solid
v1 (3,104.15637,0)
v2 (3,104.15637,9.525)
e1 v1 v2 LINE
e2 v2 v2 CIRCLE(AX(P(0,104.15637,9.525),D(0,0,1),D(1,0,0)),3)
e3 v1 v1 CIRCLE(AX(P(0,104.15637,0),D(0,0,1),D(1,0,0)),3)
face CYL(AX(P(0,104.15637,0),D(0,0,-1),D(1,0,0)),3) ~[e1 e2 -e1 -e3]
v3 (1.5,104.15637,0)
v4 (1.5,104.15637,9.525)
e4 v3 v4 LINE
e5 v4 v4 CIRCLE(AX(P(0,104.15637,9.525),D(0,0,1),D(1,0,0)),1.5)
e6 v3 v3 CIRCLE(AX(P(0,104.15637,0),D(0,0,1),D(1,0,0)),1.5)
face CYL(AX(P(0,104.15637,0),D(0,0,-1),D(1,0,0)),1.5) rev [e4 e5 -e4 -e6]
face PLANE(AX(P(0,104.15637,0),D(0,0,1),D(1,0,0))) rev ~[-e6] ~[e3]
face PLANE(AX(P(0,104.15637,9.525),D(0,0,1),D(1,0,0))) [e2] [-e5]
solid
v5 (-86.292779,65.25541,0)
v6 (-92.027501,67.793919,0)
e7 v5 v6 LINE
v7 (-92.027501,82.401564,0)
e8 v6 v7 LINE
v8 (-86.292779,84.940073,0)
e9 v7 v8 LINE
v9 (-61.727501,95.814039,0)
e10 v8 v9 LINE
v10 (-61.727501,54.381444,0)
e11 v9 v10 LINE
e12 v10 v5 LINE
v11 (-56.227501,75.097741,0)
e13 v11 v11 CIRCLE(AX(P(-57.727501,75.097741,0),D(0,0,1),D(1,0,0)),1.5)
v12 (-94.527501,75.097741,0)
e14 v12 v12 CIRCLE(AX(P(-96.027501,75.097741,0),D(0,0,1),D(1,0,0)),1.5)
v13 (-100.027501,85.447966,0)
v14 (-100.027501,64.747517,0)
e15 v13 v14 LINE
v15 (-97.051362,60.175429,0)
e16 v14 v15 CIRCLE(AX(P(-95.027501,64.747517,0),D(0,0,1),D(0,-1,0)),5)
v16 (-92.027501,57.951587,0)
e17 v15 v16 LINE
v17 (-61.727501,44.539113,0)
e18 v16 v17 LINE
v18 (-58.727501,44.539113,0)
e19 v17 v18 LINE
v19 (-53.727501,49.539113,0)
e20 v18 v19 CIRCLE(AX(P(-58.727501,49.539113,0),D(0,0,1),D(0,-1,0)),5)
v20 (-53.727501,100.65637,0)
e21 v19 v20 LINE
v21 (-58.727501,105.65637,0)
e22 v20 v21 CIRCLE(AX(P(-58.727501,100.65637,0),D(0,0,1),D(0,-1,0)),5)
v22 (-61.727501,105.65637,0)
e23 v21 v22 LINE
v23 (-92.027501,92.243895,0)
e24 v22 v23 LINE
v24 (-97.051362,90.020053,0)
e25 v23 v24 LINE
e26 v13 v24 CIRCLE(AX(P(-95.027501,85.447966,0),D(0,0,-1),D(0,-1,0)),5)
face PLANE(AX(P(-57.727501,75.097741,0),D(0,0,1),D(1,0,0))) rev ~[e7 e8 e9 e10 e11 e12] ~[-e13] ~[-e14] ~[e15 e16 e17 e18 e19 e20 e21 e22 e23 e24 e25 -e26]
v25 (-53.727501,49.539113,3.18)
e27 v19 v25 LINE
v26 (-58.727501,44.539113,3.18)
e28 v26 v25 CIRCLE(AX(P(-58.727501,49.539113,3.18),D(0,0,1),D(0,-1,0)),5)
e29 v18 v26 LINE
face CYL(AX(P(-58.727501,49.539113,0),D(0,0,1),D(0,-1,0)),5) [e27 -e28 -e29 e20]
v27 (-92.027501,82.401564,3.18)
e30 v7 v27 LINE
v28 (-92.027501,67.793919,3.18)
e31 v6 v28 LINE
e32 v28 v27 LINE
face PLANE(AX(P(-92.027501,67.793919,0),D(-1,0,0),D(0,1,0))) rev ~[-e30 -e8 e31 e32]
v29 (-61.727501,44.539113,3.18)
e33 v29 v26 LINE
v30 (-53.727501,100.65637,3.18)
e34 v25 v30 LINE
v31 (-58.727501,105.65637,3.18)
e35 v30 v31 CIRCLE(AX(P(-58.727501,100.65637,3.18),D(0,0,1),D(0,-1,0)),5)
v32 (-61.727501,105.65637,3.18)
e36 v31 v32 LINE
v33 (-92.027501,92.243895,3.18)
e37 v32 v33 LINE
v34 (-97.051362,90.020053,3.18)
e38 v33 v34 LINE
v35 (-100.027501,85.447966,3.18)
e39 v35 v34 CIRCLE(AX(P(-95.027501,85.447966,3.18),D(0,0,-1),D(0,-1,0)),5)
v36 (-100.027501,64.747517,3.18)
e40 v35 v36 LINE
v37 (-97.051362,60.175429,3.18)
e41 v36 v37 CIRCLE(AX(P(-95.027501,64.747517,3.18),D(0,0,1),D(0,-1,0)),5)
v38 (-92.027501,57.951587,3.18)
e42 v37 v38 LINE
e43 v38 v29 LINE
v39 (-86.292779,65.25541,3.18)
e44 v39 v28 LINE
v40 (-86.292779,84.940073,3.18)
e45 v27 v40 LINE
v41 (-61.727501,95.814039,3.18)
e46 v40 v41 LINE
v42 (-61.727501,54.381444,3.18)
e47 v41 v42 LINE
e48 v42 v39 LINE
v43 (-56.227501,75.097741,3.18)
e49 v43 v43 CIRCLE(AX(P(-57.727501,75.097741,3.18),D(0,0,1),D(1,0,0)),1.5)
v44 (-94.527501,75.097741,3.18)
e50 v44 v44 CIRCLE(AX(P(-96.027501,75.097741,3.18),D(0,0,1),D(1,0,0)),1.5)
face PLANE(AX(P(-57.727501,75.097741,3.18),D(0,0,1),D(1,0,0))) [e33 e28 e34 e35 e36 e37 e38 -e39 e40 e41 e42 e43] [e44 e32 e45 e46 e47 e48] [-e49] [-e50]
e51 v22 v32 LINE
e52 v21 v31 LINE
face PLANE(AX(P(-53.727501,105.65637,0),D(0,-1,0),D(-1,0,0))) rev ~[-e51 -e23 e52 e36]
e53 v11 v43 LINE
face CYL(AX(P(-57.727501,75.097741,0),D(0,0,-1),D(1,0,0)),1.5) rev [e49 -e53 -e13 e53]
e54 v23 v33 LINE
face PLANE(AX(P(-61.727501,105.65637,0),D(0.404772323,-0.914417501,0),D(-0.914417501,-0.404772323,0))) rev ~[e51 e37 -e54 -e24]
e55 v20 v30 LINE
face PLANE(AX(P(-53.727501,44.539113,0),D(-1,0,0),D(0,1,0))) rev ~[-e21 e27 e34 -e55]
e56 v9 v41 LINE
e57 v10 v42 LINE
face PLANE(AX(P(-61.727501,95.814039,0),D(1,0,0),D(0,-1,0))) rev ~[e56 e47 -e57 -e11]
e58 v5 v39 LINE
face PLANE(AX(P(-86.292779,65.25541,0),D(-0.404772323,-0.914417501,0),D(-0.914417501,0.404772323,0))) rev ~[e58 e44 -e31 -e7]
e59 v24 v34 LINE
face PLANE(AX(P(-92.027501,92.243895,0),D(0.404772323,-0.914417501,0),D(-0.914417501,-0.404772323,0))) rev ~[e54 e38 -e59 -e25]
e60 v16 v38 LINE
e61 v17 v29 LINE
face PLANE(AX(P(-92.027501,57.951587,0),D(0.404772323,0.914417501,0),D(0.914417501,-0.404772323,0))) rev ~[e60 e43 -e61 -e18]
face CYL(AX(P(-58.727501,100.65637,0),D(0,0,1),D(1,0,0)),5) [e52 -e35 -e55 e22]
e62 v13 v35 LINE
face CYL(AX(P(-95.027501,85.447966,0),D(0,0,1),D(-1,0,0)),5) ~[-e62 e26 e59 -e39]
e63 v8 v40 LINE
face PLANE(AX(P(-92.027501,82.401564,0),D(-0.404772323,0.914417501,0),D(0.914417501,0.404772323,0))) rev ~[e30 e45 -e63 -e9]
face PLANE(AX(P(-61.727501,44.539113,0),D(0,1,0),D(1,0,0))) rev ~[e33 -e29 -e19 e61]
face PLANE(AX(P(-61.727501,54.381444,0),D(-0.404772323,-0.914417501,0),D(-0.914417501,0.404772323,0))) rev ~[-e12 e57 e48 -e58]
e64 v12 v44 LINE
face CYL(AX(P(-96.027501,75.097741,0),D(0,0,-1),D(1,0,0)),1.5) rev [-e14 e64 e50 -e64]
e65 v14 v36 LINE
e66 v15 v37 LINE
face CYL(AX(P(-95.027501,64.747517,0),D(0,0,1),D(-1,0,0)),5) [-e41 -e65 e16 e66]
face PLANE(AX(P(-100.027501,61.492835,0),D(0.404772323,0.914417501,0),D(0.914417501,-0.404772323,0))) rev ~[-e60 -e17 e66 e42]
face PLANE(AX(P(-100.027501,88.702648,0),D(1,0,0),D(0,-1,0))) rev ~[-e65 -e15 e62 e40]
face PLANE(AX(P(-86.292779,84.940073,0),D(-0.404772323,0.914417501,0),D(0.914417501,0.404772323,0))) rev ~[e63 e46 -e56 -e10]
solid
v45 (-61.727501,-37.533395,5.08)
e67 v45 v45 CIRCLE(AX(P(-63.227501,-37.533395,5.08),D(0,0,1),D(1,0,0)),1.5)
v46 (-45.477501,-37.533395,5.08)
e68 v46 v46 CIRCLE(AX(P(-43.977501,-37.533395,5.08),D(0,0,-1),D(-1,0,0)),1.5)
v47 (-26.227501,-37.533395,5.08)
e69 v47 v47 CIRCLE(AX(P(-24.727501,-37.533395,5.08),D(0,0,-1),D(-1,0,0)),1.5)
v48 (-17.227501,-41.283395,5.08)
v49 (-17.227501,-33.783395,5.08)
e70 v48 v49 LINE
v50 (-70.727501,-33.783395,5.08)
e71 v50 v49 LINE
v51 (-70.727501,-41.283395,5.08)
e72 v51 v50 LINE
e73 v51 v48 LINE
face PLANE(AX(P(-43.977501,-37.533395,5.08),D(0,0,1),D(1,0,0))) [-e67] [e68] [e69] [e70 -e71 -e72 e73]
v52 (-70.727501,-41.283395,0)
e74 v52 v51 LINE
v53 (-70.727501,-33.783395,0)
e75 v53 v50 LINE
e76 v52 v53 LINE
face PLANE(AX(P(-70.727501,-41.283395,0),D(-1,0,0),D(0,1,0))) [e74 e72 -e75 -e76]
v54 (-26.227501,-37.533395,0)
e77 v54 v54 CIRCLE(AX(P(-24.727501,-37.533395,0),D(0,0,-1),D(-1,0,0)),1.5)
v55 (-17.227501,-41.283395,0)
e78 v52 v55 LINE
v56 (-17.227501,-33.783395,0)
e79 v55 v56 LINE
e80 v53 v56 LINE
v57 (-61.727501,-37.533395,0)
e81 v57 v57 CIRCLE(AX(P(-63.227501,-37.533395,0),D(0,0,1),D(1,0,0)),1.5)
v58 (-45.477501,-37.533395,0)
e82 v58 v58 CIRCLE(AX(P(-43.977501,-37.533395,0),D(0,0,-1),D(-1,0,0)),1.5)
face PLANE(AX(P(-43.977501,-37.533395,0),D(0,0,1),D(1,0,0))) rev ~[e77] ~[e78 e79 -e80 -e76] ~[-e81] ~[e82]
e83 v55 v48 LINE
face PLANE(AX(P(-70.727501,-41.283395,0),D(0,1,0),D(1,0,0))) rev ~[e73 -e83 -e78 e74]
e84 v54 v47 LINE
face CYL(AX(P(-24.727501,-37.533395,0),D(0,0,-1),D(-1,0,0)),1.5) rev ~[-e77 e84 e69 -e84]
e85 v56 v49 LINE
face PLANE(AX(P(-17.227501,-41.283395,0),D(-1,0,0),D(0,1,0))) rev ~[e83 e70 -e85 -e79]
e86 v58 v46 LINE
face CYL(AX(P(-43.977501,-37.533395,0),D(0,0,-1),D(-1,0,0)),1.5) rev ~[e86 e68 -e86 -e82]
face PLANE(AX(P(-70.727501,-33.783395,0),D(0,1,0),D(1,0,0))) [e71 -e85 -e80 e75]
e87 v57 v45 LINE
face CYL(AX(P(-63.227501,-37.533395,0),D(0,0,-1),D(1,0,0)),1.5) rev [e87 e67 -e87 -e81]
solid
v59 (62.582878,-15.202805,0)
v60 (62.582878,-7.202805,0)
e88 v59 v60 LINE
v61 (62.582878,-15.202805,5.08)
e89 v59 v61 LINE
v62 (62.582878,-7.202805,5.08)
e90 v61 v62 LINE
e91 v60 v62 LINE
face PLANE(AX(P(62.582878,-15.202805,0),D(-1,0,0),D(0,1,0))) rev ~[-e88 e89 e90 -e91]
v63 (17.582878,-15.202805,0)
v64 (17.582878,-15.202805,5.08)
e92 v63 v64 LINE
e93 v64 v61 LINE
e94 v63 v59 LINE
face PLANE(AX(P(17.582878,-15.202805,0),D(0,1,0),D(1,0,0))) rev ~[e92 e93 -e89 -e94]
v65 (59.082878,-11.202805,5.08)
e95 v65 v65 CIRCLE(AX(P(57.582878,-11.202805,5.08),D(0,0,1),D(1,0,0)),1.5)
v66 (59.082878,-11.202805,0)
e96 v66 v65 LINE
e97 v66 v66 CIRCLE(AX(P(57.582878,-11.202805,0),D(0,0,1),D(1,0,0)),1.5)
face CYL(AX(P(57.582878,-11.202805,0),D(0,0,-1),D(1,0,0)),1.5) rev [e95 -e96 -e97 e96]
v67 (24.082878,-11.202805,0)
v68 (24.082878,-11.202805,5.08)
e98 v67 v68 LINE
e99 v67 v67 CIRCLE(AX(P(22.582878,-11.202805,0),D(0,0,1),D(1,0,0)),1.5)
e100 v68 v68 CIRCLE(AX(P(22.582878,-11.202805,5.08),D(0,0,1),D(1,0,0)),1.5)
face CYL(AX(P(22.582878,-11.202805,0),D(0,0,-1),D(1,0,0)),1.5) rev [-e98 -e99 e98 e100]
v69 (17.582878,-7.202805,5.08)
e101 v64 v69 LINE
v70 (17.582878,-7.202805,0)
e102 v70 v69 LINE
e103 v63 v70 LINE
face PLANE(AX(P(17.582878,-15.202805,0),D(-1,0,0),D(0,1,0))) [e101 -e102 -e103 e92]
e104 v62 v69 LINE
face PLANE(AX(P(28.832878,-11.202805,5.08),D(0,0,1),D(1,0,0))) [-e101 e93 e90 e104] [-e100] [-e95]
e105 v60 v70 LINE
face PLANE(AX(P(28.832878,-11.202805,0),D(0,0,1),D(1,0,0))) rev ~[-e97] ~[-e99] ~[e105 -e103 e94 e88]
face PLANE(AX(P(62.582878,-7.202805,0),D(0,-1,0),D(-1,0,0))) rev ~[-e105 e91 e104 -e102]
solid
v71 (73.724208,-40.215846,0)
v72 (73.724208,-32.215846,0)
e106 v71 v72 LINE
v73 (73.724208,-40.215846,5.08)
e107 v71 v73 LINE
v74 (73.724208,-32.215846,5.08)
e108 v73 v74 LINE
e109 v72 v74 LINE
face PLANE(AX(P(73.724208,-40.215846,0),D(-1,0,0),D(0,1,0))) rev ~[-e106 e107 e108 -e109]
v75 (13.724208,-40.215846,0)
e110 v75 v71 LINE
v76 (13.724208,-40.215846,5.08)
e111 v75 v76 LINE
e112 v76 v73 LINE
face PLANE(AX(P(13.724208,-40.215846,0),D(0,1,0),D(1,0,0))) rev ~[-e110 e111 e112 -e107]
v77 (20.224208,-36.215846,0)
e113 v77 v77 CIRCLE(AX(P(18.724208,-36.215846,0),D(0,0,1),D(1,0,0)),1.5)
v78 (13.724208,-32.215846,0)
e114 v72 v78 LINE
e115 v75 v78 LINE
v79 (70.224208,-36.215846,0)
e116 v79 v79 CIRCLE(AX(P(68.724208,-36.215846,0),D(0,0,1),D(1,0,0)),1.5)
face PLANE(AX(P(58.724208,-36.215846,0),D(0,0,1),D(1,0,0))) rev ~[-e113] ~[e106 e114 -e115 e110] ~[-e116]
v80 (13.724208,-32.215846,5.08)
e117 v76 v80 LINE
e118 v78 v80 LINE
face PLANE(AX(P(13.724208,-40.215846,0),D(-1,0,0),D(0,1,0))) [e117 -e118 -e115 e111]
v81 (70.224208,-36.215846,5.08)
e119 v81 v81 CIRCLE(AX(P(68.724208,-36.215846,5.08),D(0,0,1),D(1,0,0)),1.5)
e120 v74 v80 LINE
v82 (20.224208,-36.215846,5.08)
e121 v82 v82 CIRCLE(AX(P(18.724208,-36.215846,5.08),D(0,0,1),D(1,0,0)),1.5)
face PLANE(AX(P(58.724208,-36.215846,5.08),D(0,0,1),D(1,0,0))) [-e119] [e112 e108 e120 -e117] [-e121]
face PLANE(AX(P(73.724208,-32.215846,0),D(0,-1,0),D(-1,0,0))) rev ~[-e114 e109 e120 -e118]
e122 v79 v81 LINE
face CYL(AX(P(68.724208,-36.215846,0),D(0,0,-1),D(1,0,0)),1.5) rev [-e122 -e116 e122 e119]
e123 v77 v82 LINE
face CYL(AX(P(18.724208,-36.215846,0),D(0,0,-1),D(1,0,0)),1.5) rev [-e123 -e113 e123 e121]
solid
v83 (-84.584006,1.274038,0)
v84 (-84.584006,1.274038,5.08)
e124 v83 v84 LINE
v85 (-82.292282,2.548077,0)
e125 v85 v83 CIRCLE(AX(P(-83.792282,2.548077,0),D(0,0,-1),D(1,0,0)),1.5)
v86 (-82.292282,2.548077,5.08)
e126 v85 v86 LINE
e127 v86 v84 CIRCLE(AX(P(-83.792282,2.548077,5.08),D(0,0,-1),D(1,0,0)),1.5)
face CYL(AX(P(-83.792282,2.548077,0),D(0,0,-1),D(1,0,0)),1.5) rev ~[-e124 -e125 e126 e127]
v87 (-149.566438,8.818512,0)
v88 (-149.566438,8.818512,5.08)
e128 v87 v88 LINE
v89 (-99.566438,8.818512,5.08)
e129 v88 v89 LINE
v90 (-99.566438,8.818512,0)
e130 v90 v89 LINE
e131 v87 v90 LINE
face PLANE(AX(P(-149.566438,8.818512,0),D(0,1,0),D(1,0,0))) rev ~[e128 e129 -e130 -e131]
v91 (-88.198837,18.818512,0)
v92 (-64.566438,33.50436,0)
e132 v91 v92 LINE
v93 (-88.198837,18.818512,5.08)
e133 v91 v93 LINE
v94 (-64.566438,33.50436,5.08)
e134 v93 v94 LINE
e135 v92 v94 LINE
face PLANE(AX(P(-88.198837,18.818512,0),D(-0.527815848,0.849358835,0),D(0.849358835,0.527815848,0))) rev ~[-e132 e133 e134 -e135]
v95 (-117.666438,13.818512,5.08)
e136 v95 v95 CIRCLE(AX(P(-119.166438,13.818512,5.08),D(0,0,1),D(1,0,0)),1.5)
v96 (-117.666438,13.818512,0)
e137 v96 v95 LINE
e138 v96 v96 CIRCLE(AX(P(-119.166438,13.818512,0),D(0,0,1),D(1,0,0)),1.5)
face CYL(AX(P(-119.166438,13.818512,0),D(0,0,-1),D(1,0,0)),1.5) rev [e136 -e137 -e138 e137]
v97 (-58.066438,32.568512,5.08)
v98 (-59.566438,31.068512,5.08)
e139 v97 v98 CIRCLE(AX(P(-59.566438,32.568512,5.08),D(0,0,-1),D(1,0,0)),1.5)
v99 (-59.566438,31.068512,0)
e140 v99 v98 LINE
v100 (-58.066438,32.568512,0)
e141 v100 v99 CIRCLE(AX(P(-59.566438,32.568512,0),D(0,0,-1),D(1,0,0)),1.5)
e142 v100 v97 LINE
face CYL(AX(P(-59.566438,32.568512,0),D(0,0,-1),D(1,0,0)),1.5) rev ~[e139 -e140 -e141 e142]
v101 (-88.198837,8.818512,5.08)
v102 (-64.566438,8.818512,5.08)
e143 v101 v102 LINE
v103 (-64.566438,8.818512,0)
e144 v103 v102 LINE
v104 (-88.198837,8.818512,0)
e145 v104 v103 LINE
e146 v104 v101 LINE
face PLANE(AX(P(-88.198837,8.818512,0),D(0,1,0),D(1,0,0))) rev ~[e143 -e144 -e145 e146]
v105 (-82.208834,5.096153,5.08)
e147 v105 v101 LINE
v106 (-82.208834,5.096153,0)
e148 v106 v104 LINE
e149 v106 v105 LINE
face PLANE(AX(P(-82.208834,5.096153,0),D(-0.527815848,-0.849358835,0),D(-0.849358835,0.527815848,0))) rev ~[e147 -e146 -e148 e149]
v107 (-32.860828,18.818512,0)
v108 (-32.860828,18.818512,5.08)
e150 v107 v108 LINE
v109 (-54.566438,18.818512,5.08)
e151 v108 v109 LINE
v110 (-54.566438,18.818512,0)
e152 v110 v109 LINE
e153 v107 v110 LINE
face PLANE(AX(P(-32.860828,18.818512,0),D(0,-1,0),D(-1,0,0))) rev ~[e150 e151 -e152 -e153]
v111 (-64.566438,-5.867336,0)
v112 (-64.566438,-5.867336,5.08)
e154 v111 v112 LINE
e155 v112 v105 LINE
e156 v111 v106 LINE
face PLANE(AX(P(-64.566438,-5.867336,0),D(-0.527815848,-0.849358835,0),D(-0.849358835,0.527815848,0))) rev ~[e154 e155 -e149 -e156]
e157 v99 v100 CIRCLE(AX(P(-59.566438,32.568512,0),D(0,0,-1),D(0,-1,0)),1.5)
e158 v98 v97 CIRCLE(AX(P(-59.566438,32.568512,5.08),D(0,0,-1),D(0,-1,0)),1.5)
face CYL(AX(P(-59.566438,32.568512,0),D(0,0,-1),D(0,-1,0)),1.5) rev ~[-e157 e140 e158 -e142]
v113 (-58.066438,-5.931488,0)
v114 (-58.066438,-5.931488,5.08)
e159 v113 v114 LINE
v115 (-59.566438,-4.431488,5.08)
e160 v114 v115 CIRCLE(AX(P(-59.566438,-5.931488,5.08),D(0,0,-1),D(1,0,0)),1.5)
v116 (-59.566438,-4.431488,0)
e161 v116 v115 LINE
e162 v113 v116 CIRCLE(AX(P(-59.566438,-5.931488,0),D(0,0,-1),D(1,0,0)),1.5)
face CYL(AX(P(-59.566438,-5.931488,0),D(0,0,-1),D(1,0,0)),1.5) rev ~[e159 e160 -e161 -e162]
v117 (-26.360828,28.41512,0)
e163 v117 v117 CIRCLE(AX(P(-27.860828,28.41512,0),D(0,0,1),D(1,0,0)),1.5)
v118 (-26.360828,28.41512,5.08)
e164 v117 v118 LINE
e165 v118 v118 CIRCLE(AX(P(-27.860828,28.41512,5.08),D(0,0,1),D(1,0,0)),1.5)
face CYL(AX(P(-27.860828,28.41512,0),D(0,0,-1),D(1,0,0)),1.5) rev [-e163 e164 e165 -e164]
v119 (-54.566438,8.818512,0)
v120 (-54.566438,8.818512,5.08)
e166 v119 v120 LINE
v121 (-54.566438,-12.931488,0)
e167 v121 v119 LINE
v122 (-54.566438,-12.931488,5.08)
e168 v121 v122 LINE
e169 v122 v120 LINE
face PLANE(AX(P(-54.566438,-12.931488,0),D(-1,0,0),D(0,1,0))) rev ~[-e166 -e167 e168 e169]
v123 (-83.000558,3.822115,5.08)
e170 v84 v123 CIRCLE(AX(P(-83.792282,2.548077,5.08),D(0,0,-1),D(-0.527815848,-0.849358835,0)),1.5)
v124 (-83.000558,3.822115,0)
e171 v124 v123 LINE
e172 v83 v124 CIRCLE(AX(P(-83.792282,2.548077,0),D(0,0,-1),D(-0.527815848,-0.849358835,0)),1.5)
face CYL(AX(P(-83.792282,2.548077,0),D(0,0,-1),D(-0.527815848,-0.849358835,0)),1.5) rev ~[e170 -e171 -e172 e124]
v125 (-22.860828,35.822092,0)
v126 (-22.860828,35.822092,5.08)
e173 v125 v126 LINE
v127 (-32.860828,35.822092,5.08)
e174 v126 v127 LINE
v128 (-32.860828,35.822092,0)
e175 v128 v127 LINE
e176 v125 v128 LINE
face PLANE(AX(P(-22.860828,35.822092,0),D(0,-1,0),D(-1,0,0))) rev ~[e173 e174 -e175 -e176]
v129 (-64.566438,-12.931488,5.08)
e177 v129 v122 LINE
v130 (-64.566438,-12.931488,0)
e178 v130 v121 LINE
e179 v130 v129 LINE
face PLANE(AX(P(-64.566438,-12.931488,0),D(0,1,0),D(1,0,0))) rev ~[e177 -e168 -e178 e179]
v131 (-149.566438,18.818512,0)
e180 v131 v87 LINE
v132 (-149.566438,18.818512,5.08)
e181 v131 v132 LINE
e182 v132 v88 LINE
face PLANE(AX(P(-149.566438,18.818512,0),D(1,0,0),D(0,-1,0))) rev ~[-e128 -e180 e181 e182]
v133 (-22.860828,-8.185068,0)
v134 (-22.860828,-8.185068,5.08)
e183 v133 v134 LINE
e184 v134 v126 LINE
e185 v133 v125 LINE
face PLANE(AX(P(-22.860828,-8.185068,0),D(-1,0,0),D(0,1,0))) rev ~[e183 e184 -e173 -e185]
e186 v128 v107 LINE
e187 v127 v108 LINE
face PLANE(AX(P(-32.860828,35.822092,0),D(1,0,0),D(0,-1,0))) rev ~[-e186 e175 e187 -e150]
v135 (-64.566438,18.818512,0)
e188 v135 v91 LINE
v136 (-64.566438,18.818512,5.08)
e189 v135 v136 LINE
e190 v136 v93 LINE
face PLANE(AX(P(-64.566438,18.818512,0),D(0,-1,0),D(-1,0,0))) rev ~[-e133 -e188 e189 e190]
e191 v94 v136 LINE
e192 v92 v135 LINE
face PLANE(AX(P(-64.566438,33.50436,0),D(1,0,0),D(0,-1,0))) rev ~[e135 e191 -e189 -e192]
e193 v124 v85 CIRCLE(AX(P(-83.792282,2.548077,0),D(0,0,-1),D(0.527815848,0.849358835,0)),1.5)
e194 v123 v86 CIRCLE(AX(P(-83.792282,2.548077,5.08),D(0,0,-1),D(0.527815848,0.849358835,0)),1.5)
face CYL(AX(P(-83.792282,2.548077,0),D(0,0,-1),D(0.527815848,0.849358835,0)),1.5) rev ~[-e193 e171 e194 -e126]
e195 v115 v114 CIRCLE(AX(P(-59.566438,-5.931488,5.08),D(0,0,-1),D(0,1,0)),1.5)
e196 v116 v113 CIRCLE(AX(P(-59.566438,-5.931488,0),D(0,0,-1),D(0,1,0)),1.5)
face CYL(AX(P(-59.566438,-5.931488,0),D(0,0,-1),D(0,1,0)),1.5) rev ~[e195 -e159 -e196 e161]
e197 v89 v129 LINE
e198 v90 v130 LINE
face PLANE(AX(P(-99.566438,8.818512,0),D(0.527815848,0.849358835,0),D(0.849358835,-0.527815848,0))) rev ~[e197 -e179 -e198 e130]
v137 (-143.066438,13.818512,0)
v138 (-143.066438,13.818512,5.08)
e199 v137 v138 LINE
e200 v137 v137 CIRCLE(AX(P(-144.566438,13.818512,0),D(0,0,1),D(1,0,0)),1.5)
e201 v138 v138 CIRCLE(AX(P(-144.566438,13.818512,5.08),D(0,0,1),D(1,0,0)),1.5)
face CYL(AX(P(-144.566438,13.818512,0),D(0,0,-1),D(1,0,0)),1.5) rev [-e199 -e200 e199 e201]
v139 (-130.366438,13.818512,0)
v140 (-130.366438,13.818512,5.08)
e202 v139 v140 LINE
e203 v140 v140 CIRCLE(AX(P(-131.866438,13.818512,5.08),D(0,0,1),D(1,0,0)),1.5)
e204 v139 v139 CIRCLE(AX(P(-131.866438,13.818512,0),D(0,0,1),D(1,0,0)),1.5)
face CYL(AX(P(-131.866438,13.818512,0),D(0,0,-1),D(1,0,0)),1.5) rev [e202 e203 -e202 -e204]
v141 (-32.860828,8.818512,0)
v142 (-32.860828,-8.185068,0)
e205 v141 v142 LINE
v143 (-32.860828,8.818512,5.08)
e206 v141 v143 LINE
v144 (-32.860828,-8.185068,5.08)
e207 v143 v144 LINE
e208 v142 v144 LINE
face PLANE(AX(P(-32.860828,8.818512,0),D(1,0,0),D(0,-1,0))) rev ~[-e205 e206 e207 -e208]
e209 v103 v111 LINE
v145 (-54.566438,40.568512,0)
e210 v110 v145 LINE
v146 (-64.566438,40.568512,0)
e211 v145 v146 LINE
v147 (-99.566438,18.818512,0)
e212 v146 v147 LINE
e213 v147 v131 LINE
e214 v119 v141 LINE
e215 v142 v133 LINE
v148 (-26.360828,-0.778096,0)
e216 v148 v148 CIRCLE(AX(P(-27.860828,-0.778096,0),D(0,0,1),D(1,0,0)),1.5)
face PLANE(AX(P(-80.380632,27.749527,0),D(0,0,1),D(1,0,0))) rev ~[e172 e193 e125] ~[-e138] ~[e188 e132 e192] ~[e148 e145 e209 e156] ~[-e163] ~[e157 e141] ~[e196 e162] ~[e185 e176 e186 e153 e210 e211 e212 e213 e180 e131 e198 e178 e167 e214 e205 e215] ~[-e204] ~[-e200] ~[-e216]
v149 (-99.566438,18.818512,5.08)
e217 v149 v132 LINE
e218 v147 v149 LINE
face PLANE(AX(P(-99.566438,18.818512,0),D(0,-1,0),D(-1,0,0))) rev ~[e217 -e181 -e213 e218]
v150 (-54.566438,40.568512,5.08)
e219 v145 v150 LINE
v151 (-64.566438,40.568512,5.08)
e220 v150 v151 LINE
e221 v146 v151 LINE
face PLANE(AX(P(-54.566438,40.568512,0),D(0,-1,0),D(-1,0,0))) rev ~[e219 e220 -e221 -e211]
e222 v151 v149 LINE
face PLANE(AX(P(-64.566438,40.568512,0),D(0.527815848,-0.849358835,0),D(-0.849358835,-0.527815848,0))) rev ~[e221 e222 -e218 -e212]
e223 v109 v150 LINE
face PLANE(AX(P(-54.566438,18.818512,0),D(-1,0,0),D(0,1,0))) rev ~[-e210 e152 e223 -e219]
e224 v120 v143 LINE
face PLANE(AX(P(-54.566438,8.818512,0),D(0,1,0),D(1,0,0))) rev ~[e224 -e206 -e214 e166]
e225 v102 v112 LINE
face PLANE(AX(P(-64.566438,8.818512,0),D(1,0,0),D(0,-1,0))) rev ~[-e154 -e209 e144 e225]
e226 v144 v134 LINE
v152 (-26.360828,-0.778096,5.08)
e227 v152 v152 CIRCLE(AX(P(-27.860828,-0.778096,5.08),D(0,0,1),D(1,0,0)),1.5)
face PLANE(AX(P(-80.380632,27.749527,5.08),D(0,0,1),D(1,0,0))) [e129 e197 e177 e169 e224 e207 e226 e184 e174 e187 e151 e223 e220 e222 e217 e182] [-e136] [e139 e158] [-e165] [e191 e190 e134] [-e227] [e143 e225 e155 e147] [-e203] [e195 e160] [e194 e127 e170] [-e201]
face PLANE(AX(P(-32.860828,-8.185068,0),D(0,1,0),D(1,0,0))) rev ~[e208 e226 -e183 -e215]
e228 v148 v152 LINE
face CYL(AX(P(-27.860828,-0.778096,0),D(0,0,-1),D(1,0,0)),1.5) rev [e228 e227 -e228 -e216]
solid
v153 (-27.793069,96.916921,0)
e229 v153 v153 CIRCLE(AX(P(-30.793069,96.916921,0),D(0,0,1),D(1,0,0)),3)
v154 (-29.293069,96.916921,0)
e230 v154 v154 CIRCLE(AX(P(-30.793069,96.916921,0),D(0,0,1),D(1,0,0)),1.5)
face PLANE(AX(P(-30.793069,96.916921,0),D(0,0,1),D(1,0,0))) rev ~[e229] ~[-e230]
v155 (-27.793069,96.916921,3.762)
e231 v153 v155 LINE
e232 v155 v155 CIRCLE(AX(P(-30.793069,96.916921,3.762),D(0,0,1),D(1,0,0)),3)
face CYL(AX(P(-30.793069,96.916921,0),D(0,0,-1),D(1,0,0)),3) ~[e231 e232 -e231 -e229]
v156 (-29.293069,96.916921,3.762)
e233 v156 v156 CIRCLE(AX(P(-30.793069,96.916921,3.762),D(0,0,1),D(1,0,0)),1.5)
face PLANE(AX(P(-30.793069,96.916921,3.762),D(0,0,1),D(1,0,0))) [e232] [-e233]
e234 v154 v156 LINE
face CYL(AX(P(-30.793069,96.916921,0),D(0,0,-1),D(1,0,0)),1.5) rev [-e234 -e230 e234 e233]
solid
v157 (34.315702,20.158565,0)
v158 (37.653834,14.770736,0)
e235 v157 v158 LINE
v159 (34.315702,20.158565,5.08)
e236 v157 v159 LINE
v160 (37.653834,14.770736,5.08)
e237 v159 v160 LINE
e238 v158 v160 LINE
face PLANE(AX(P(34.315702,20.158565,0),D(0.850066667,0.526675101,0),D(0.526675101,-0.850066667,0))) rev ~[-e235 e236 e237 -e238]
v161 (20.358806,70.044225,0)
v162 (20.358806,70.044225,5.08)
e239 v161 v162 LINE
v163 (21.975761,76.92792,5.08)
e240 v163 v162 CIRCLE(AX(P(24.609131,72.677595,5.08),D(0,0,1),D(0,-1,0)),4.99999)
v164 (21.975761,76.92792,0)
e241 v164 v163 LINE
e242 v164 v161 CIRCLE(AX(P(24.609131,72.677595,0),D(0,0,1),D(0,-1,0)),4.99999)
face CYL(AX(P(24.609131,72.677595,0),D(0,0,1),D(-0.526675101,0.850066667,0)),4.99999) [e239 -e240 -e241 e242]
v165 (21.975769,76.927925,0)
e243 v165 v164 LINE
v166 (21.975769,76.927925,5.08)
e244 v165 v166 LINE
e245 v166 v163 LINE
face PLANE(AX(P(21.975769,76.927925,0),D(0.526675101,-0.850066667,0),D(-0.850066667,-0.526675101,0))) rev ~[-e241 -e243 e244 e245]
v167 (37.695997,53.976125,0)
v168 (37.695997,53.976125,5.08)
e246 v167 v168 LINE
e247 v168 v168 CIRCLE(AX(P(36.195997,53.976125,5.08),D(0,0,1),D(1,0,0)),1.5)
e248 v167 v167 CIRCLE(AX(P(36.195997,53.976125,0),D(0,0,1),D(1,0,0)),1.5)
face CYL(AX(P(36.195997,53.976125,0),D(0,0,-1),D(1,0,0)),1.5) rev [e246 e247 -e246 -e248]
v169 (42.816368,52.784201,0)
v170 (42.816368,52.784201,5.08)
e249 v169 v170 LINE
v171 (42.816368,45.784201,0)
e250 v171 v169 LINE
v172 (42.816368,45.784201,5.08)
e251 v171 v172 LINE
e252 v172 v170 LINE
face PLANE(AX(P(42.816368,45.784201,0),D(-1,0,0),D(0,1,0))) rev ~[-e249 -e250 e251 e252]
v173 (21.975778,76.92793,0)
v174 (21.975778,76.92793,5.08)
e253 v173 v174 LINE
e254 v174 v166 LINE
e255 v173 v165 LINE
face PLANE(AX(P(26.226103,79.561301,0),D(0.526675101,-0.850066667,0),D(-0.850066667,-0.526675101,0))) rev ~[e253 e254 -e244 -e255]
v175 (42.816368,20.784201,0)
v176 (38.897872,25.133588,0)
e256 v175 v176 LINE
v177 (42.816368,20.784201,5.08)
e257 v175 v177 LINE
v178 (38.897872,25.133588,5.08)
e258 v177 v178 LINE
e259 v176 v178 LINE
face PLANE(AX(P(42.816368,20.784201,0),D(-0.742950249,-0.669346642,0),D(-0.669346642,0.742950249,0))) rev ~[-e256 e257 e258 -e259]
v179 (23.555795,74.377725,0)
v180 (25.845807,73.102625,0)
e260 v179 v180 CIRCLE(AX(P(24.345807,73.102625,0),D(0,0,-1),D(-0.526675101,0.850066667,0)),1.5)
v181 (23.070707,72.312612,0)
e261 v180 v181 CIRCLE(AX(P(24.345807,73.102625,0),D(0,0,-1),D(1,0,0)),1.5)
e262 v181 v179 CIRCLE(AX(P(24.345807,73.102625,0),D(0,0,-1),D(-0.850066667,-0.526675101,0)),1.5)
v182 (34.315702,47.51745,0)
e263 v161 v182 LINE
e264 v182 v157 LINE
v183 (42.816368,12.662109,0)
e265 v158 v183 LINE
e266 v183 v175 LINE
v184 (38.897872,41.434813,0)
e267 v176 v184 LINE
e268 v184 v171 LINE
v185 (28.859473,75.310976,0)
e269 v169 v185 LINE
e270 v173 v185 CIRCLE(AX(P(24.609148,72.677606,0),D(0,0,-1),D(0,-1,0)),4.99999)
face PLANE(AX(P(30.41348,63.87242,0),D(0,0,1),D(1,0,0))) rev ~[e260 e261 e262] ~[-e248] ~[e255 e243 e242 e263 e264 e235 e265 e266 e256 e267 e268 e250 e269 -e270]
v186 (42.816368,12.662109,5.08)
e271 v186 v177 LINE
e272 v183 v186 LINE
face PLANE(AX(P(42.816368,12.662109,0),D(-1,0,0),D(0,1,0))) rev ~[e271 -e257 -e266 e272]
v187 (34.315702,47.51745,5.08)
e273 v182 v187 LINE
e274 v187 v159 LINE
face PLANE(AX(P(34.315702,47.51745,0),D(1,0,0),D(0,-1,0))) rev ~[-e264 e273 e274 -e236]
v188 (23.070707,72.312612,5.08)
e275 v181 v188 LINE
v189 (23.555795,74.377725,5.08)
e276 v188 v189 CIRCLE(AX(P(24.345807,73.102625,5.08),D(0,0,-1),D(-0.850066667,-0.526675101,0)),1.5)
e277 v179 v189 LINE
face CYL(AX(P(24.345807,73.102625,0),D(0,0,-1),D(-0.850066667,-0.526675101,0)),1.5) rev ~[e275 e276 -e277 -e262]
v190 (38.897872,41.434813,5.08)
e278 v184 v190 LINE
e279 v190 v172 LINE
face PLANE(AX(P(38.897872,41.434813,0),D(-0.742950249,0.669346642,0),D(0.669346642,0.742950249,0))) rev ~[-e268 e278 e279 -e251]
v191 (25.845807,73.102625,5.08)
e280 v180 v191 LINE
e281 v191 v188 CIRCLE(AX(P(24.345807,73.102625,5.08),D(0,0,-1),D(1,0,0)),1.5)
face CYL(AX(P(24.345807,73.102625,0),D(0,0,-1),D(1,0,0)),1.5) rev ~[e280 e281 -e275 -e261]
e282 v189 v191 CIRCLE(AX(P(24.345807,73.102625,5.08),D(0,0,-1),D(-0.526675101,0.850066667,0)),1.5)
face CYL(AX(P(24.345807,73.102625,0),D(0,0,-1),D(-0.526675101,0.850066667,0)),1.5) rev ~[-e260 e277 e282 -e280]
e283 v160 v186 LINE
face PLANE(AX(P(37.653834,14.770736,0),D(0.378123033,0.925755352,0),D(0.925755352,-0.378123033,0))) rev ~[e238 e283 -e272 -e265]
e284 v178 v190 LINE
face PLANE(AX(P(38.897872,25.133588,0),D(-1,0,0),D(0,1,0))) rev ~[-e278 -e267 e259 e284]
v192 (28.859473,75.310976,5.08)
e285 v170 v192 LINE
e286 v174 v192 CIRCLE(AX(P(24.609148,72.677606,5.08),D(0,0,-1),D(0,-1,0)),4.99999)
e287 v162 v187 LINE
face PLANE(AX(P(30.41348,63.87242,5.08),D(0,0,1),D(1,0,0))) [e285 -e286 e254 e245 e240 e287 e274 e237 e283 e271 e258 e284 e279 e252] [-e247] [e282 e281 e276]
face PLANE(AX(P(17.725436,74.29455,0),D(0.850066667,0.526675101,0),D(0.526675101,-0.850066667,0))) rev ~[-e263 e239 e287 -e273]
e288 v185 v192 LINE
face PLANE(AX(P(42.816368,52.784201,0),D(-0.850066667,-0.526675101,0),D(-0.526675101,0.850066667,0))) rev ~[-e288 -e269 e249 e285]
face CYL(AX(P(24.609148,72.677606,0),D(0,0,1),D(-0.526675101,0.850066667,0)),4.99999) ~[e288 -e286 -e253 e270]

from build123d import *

# Parameters (mm, degrees)
F0_W     = 8
F0_H     = 19.684662618
F0_R     = 1.5
F0_H_2   = 10.8739659115
F1_DEPTH = 3.18
F0_R_2   = 3
F2_DEPTH = 3.762
F3_DEPTH = 5.08
F0_W_2   = 53.5
F0_H_3   = 7.5
F0_W_3   = 5
F0_H_4   = 5
F0_W_4   = 16.7056103051
F0_H_5   = 10
F0_W_5   = 22.5
F0_H_6   = 8
F0_W_6   = 30
F4_R     = 4.99999
F5_DEPTH = 9.525
F6_R     = 5


# Not quite as in the source:
# - a fillet or chamfer is up to 0.001 mm smaller than in the source, because OpenCascade refuses the exact size
# - a feature names something its author has since deleted; it is built from what else it names


with BuildPart() as f1:
    # F0 (on Top) → F1 (new body)
    with BuildSketch(Plane.XY):
        with Locations((-57.7275006586, 75.0977412903)):
            Rectangle(F0_W, F0_H)
        with Locations((-57.7275006586, 75.0977412903)):
            Circle(F0_R, mode=Mode.SUBTRACT)
        with Locations((-57.7275006586, 90.3770555551)):
            Rectangle(F0_W, F0_H_2)
        Polygon((-61.7275006586, 95.8140385108), (-53.7275006586, 95.8140385108), (-53.7275006586, 105.6563698198), (-61.7275006586, 105.6563698198), (-92.0275006586, 92.2438953373), (-92.0275006586, 84.9400725994), (-86.2927788664, 84.9400725994), align=None)
        with Locations((-57.7275006586, 59.8184270256)):
            Rectangle(F0_W, F0_H_2)
        Polygon((-92.0275006586, 82.4015640283), (-86.2927788664, 84.9400725994), (-92.0275006586, 84.9400725994), align=None)
        Polygon((-53.7275006586, 44.5391127608), (-53.7275006586, 54.3814440698), (-61.7275006586, 54.3814440698), (-86.2927788664, 65.2554099813), (-92.0275006586, 65.2554099813), (-92.0275006586, 57.9515872433), (-61.7275006586, 44.5391127608), align=None)
        Polygon((-92.0275006586, 82.4015640283), (-92.0275006586, 84.9400725994), (-100.0275006586, 84.9400725994), (-100.0275006586, 78.8603166402), align=None)
        Polygon((-100.0275006586, 84.9400725994), (-92.0275006586, 84.9400725994), (-92.0275006586, 92.2438953373), (-100.0275006586, 88.7026479492), align=None)
        Polygon((-92.0275006586, 67.7939185523), (-92.0275006586, 82.4015640283), (-100.0275006586, 78.8603166402), (-100.0275006586, 71.3351659405), align=None)
        with Locations((-96.0275006586, 75.0977412903)):
            Circle(F0_R, mode=Mode.SUBTRACT)
        Polygon((-92.0275006586, 65.2554099813), (-86.2927788664, 65.2554099813), (-92.0275006586, 67.7939185523), align=None)
        Polygon((-92.0275006586, 65.2554099813), (-92.0275006586, 67.7939185523), (-100.0275006586, 71.3351659405), (-100.0275006586, 65.2554099813), align=None)
        Polygon((-92.0275006586, 57.9515872433), (-92.0275006586, 65.2554099813), (-100.0275006586, 65.2554099813), (-100.0275006586, 61.4928346314), align=None)
    extrude(amount=F1_DEPTH)

    # F6
    f6_edges = [f1.edges().sort_by_distance(p)[0] for p in [
        (-100.027501, 61.492835, 1.59),
        (-100.027501, 88.702648, 1.59),
        (-53.727501, 105.65637, 1.59),
        (-53.727501, 44.539113, 1.59),
    ]]
    fillet(f6_edges, radius=F6_R)


with BuildPart() as f2:
    # F0 (on Top) → F2 (new body)
    with BuildSketch(Plane.XY):
        with Locations((-30.7930689305, 96.9169214368)):
            Circle(F0_R_2)
        with Locations((-30.7930689305, 96.9169214368)):
            Circle(F0_R, mode=Mode.SUBTRACT)
    extrude(amount=F2_DEPTH)


with BuildPart() as f3:
    # F0 (on Top) → F3 (new body)
    with BuildSketch(Plane.XY):
        with BuildLine():
            ThreePointArc((23.5557945233, 74.3777250811), (25.0755266494, 74.4131629436), (25.8458071751, 73.1026250811))
            ThreePointArc((25.8458071751, 73.1026250811), (24.756507796, 71.659945283), (23.0707071751, 72.3126124293))
            Line((23.0707071751, 72.3126124293), (20.0954738417, 70.4692495751))
            Line((20.0954738417, 70.4692495751), (26.0205687302, 60.9059995751))
            Line((26.0205687302, 60.9059995751), (31.9456636187, 51.3427495751))
            Line((31.9456636187, 51.3427495751), (34.3157015741, 47.5174495751))
            Line((34.3157015741, 47.5174495751), (38.5660349074, 50.1508250811))
            Line((38.5660349074, 50.1508250811), (42.8163682408, 52.7842005871))
            Line((42.8163682408, 52.7842005871), (40.4463302854, 56.6095005871))
            Line((40.4463302854, 56.6095005871), (28.5961405084, 75.7360005871))
            Line((28.5961405084, 75.7360005871), (26.226102553, 79.5613005871))
            Line((26.226102553, 79.5613005871), (21.9757692197, 76.9279250811))
            Line((21.9757692197, 76.9279250811), (23.5557945233, 74.3777250811))
        make_face()
        with Locations((36.195996952, 53.9761250811)):
            Circle(F0_R, mode=Mode.SUBTRACT)
        with BuildLine():
            ThreePointArc((23.0707071751, 72.3126124293), (22.8855520151, 73.4456336345), (23.5557945233, 74.3777250811))
            Line((23.5557945233, 74.3777250811), (21.9757692197, 76.9279250811))
            Line((21.9757692197, 76.9279250811), (17.7254358863, 74.2945495751))
            Line((17.7254358863, 74.2945495751), (20.0954738417, 70.4692495751))
            Line((20.0954738417, 70.4692495751), (23.0707071751, 72.3126124293))
        make_face()
        Polygon((38.5660349074, 50.1508250811), (34.3157015741, 47.5174495751), (34.3157015741, 33.2842005871), (38.8978719711, 33.2842005871), (38.8978719711, 41.4348132908), (38.8978719711, 45.7842005871), (42.8163682408, 45.7842005871), (42.8163682408, 52.7842005871), align=None)
        Polygon((38.8978719711, 41.4348132908), (42.8163682408, 45.7842005871), (38.8978719711, 45.7842005871), align=None)
        Polygon((38.8978719711, 33.2842005871), (34.3157015741, 33.2842005871), (34.3157015741, 20.1585646719), (37.6538338433, 14.7707364557), (42.8163682408, 12.6621089876), (42.8163682408, 20.7842005871), (38.8978719711, 20.7842005871), (38.8978719711, 25.1335878834), align=None)
        Polygon((42.8163682408, 20.7842005871), (38.8978719711, 25.1335878834), (38.8978719711, 20.7842005871), align=None)
    extrude(amount=F3_DEPTH)

    # F4 (radius 5 in the source; OpenCascade refuses exactly that, so slightly less here)
    f4_edges = [f3.edges().sort_by_distance(p)[0] for p in [
        (17.725436, 74.29455, 2.54),
        (26.226103, 79.561301, 2.54),
    ]]
    fillet(f4_edges, radius=F4_R)


with BuildPart() as f3b:
    # F0 (on Top) → F3, piece 2 (new body)
    with BuildSketch(Plane.XY):
        with Locations((-43.9775006586, -37.5333949924)):
            Rectangle(F0_W_2, F0_H_3)
        with Locations((-63.2275006586, -37.5333949924)):
            Circle(F0_R, mode=Mode.SUBTRACT)
        with BuildLine():
            ThreePointArc((-42.4775006586, -37.5333949924), (-43.9775006586, -39.0333949924), (-45.4775006586, -37.5333949924))
            ThreePointArc((-45.4775006586, -37.5333949924), (-43.9775006586, -36.0333949924), (-42.4775006586, -37.5333949924))
        make_face(mode=Mode.SUBTRACT)
        with BuildLine():
            ThreePointArc((-23.2275006586, -37.5333949924), (-24.7275006586, -39.0333949924), (-26.2275006586, -37.5333949924))
            ThreePointArc((-26.2275006586, -37.5333949924), (-24.7275006586, -36.0333949924), (-23.2275006586, -37.5333949924))
        make_face(mode=Mode.SUBTRACT)
    extrude(amount=F3_DEPTH)


with BuildPart() as f3c:
    # F0 (on Top) → F3, piece 3 (new body)
    with BuildSketch(Plane.XY):
        Polygon((-99.5664379767, 18.8185117334), (-88.1988368955, 18.8185117334), (-64.5664379767, 33.504359633), (-64.5664379767, 40.5685117334), align=None)
        Polygon((-64.5664379767, 33.504359633), (-64.5664379767, 18.8185117334), (-59.5664379767, 18.8185117334), (-54.5664379767, 18.8185117334), (-54.5664379767, 40.5685117334), (-64.5664379767, 40.5685117334), align=None)
        with BuildLine():
            ThreePointArc((-58.0664379767, 32.5685117334), (-58.5057778049, 31.5078515616), (-59.5664379767, 31.0685117334))
            ThreePointArc((-59.5664379767, 31.0685117334), (-60.6270981485, 33.6291719052), (-58.0664379767, 32.5685117334))
        make_face(mode=Mode.SUBTRACT)
        with Locations((-62.0664379767, 16.3185117334)):
            Rectangle(F0_W_3, F0_H_4)
        with Locations((-57.0664379767, 16.3185117334)):
            Rectangle(F0_W_3, F0_H_4)
        Polygon((-59.5664379767, 8.8185117334), (-64.5664379767, 8.8185117334), (-64.5664379767, -5.8673361662), (-64.5664379767, -12.9314882666), (-54.5664379767, -12.9314882666), (-54.5664379767, 8.8185117334), align=None)
        with BuildLine():
            ThreePointArc((-58.0664379767, -5.9314882666), (-60.6270981485, -6.9921484384), (-59.5664379767, -4.4314882666))
            ThreePointArc((-59.5664379767, -4.4314882666), (-58.5057778049, -4.8708280948), (-58.0664379767, -5.9314882666))
        make_face(mode=Mode.SUBTRACT)
        Polygon((-64.5664379767, 18.8185117334), (-88.1988368955, 18.8185117334), (-99.5664379767, 18.8185117334), (-149.5664379767, 18.8185117334), (-149.5664379767, 8.8185117334), (-99.5664379767, 8.8185117334), (-88.1988368955, 8.8185117334), (-64.5664379767, 8.8185117334), (-64.5664379767, 13.8185117334), align=None)
        with Locations((-144.5664379767, 13.8185117334)):
            Circle(F0_R, mode=Mode.SUBTRACT)
        with Locations((-131.8664379767, 13.8185117334)):
            Circle(F0_R, mode=Mode.SUBTRACT)
        with Locations((-119.1664379767, 13.8185117334)):
            Circle(F0_R, mode=Mode.SUBTRACT)
        with Locations((-57.0664379767, 11.3185117334)):
            Rectangle(F0_W_3, F0_H_4)
        with Locations((-62.0664379767, 11.3185117334)):
            Rectangle(F0_W_3, F0_H_4)
        Polygon((-49.5664379767, 18.8185117334), (-54.5664379767, 18.8185117334), (-54.5664379767, 13.8185117334), (-54.5664379767, 8.8185117334), (-49.5664379767, 8.8185117334), align=None)
        with Locations((-41.2136328242, 13.8185117334)):
            Rectangle(F0_W_4, F0_H_5)
        Polygon((-32.8608276716, 35.822091948), (-32.8608276716, 18.8185117334), (-27.8608276716, 18.8185117334), (-27.8608276716, 8.8185117334), (-32.8608276716, 8.8185117334), (-32.8608276716, -8.1850684811), (-22.8608276716, -8.1850684811), (-22.8608276716, 35.822091948), align=None)
        with Locations((-27.8608276716, -0.7780961324)):
            Circle(F0_R, mode=Mode.SUBTRACT)
        with Locations((-27.8608276716, 28.4151195993)):
            Circle(F0_R, mode=Mode.SUBTRACT)
        with Locations((-30.3608276716, 13.8185117334)):
            Rectangle(F0_W_3, F0_H_5)
        with BuildLine():
            Line((-88.1988368955, 8.8185117334), (-99.5664379767, 8.8185117334))
            Line((-99.5664379767, 8.8185117334), (-85.3757294402, 0))
            Line((-85.3757294402, 0), (-84.5840056687, 1.2740382529))
            ThreePointArc((-84.5840056687, 1.2740382529), (-85.0663201502, 3.3398002772), (-83.0005581259, 3.8221147586))
            Line((-83.0005581259, 3.8221147586), (-82.2088343545, 5.0961530115))
            Line((-82.2088343545, 5.0961530115), (-88.1988368955, 8.8185117334))
        make_face()
        with BuildLine():
            Line((-64.5664379767, -12.9314882666), (-64.5664379767, -5.8673361662))
            Line((-64.5664379767, -5.8673361662), (-82.2088343545, 5.0961530115))
            Line((-82.2088343545, 5.0961530115), (-83.0005581259, 3.8221147586))
            ThreePointArc((-83.0005581259, 3.8221147586), (-82.481254503, 3.2769161118), (-82.2922818973, 2.5480765057))
            ThreePointArc((-82.2922818973, 2.5480765057), (-83.0634422912, 1.2370491114), (-84.5840056687, 1.2740382529))
            Line((-84.5840056687, 1.2740382529), (-85.3757294402, 0))
            Line((-85.3757294402, 0), (-64.5664379767, -12.9314882666))
        make_face()
    extrude(amount=F3_DEPTH)


with BuildPart() as f3d:
    # F0 (on Top) → F3, piece 4 (new body)
    with BuildSketch(Plane.XY):
        with Locations((28.8328784704, -11.2028054856)):
            Rectangle(F0_W_5, F0_H_6)
        with Locations((22.5828784704, -11.2028054856)):
            Circle(F0_R, mode=Mode.SUBTRACT)
        with Locations((51.3328784704, -11.2028054856)):
            Rectangle(F0_W_5, F0_H_6)
        with Locations((57.5828784704, -11.2028054856)):
            Circle(F0_R, mode=Mode.SUBTRACT)
    extrude(amount=F3_DEPTH)


with BuildPart() as f3e:
    # F0 (on Top) → F3, piece 5 (new body)
    with BuildSketch(Plane.XY):
        with Locations((58.7242078781, -36.2158461511)):
            Rectangle(F0_W_6, F0_H_6)
        with Locations((68.7242078781, -36.2158461511)):
            Circle(F0_R, mode=Mode.SUBTRACT)
        with Locations((28.7242078781, -36.2158461511)):
            Rectangle(F0_W_6, F0_H_6)
        with Locations((18.7242078781, -36.2158461511)):
            Circle(F0_R, mode=Mode.SUBTRACT)
    extrude(amount=F3_DEPTH)


with BuildPart() as f5:
    # F0 (on Top) → F5 (new body)
    with BuildSketch(Plane.XY):
        with Locations((0, 104.1563698198)):
            Circle(F0_R_2)
        with Locations((0, 104.1563698198)):
            Circle(F0_R, mode=Mode.SUBTRACT)
    extrude(amount=F5_DEPTH)


solid = Compound([f1.part, f2.part, f3.part, f3b.part, f3c.part, f3d.part, f3e.part, f5.part])
